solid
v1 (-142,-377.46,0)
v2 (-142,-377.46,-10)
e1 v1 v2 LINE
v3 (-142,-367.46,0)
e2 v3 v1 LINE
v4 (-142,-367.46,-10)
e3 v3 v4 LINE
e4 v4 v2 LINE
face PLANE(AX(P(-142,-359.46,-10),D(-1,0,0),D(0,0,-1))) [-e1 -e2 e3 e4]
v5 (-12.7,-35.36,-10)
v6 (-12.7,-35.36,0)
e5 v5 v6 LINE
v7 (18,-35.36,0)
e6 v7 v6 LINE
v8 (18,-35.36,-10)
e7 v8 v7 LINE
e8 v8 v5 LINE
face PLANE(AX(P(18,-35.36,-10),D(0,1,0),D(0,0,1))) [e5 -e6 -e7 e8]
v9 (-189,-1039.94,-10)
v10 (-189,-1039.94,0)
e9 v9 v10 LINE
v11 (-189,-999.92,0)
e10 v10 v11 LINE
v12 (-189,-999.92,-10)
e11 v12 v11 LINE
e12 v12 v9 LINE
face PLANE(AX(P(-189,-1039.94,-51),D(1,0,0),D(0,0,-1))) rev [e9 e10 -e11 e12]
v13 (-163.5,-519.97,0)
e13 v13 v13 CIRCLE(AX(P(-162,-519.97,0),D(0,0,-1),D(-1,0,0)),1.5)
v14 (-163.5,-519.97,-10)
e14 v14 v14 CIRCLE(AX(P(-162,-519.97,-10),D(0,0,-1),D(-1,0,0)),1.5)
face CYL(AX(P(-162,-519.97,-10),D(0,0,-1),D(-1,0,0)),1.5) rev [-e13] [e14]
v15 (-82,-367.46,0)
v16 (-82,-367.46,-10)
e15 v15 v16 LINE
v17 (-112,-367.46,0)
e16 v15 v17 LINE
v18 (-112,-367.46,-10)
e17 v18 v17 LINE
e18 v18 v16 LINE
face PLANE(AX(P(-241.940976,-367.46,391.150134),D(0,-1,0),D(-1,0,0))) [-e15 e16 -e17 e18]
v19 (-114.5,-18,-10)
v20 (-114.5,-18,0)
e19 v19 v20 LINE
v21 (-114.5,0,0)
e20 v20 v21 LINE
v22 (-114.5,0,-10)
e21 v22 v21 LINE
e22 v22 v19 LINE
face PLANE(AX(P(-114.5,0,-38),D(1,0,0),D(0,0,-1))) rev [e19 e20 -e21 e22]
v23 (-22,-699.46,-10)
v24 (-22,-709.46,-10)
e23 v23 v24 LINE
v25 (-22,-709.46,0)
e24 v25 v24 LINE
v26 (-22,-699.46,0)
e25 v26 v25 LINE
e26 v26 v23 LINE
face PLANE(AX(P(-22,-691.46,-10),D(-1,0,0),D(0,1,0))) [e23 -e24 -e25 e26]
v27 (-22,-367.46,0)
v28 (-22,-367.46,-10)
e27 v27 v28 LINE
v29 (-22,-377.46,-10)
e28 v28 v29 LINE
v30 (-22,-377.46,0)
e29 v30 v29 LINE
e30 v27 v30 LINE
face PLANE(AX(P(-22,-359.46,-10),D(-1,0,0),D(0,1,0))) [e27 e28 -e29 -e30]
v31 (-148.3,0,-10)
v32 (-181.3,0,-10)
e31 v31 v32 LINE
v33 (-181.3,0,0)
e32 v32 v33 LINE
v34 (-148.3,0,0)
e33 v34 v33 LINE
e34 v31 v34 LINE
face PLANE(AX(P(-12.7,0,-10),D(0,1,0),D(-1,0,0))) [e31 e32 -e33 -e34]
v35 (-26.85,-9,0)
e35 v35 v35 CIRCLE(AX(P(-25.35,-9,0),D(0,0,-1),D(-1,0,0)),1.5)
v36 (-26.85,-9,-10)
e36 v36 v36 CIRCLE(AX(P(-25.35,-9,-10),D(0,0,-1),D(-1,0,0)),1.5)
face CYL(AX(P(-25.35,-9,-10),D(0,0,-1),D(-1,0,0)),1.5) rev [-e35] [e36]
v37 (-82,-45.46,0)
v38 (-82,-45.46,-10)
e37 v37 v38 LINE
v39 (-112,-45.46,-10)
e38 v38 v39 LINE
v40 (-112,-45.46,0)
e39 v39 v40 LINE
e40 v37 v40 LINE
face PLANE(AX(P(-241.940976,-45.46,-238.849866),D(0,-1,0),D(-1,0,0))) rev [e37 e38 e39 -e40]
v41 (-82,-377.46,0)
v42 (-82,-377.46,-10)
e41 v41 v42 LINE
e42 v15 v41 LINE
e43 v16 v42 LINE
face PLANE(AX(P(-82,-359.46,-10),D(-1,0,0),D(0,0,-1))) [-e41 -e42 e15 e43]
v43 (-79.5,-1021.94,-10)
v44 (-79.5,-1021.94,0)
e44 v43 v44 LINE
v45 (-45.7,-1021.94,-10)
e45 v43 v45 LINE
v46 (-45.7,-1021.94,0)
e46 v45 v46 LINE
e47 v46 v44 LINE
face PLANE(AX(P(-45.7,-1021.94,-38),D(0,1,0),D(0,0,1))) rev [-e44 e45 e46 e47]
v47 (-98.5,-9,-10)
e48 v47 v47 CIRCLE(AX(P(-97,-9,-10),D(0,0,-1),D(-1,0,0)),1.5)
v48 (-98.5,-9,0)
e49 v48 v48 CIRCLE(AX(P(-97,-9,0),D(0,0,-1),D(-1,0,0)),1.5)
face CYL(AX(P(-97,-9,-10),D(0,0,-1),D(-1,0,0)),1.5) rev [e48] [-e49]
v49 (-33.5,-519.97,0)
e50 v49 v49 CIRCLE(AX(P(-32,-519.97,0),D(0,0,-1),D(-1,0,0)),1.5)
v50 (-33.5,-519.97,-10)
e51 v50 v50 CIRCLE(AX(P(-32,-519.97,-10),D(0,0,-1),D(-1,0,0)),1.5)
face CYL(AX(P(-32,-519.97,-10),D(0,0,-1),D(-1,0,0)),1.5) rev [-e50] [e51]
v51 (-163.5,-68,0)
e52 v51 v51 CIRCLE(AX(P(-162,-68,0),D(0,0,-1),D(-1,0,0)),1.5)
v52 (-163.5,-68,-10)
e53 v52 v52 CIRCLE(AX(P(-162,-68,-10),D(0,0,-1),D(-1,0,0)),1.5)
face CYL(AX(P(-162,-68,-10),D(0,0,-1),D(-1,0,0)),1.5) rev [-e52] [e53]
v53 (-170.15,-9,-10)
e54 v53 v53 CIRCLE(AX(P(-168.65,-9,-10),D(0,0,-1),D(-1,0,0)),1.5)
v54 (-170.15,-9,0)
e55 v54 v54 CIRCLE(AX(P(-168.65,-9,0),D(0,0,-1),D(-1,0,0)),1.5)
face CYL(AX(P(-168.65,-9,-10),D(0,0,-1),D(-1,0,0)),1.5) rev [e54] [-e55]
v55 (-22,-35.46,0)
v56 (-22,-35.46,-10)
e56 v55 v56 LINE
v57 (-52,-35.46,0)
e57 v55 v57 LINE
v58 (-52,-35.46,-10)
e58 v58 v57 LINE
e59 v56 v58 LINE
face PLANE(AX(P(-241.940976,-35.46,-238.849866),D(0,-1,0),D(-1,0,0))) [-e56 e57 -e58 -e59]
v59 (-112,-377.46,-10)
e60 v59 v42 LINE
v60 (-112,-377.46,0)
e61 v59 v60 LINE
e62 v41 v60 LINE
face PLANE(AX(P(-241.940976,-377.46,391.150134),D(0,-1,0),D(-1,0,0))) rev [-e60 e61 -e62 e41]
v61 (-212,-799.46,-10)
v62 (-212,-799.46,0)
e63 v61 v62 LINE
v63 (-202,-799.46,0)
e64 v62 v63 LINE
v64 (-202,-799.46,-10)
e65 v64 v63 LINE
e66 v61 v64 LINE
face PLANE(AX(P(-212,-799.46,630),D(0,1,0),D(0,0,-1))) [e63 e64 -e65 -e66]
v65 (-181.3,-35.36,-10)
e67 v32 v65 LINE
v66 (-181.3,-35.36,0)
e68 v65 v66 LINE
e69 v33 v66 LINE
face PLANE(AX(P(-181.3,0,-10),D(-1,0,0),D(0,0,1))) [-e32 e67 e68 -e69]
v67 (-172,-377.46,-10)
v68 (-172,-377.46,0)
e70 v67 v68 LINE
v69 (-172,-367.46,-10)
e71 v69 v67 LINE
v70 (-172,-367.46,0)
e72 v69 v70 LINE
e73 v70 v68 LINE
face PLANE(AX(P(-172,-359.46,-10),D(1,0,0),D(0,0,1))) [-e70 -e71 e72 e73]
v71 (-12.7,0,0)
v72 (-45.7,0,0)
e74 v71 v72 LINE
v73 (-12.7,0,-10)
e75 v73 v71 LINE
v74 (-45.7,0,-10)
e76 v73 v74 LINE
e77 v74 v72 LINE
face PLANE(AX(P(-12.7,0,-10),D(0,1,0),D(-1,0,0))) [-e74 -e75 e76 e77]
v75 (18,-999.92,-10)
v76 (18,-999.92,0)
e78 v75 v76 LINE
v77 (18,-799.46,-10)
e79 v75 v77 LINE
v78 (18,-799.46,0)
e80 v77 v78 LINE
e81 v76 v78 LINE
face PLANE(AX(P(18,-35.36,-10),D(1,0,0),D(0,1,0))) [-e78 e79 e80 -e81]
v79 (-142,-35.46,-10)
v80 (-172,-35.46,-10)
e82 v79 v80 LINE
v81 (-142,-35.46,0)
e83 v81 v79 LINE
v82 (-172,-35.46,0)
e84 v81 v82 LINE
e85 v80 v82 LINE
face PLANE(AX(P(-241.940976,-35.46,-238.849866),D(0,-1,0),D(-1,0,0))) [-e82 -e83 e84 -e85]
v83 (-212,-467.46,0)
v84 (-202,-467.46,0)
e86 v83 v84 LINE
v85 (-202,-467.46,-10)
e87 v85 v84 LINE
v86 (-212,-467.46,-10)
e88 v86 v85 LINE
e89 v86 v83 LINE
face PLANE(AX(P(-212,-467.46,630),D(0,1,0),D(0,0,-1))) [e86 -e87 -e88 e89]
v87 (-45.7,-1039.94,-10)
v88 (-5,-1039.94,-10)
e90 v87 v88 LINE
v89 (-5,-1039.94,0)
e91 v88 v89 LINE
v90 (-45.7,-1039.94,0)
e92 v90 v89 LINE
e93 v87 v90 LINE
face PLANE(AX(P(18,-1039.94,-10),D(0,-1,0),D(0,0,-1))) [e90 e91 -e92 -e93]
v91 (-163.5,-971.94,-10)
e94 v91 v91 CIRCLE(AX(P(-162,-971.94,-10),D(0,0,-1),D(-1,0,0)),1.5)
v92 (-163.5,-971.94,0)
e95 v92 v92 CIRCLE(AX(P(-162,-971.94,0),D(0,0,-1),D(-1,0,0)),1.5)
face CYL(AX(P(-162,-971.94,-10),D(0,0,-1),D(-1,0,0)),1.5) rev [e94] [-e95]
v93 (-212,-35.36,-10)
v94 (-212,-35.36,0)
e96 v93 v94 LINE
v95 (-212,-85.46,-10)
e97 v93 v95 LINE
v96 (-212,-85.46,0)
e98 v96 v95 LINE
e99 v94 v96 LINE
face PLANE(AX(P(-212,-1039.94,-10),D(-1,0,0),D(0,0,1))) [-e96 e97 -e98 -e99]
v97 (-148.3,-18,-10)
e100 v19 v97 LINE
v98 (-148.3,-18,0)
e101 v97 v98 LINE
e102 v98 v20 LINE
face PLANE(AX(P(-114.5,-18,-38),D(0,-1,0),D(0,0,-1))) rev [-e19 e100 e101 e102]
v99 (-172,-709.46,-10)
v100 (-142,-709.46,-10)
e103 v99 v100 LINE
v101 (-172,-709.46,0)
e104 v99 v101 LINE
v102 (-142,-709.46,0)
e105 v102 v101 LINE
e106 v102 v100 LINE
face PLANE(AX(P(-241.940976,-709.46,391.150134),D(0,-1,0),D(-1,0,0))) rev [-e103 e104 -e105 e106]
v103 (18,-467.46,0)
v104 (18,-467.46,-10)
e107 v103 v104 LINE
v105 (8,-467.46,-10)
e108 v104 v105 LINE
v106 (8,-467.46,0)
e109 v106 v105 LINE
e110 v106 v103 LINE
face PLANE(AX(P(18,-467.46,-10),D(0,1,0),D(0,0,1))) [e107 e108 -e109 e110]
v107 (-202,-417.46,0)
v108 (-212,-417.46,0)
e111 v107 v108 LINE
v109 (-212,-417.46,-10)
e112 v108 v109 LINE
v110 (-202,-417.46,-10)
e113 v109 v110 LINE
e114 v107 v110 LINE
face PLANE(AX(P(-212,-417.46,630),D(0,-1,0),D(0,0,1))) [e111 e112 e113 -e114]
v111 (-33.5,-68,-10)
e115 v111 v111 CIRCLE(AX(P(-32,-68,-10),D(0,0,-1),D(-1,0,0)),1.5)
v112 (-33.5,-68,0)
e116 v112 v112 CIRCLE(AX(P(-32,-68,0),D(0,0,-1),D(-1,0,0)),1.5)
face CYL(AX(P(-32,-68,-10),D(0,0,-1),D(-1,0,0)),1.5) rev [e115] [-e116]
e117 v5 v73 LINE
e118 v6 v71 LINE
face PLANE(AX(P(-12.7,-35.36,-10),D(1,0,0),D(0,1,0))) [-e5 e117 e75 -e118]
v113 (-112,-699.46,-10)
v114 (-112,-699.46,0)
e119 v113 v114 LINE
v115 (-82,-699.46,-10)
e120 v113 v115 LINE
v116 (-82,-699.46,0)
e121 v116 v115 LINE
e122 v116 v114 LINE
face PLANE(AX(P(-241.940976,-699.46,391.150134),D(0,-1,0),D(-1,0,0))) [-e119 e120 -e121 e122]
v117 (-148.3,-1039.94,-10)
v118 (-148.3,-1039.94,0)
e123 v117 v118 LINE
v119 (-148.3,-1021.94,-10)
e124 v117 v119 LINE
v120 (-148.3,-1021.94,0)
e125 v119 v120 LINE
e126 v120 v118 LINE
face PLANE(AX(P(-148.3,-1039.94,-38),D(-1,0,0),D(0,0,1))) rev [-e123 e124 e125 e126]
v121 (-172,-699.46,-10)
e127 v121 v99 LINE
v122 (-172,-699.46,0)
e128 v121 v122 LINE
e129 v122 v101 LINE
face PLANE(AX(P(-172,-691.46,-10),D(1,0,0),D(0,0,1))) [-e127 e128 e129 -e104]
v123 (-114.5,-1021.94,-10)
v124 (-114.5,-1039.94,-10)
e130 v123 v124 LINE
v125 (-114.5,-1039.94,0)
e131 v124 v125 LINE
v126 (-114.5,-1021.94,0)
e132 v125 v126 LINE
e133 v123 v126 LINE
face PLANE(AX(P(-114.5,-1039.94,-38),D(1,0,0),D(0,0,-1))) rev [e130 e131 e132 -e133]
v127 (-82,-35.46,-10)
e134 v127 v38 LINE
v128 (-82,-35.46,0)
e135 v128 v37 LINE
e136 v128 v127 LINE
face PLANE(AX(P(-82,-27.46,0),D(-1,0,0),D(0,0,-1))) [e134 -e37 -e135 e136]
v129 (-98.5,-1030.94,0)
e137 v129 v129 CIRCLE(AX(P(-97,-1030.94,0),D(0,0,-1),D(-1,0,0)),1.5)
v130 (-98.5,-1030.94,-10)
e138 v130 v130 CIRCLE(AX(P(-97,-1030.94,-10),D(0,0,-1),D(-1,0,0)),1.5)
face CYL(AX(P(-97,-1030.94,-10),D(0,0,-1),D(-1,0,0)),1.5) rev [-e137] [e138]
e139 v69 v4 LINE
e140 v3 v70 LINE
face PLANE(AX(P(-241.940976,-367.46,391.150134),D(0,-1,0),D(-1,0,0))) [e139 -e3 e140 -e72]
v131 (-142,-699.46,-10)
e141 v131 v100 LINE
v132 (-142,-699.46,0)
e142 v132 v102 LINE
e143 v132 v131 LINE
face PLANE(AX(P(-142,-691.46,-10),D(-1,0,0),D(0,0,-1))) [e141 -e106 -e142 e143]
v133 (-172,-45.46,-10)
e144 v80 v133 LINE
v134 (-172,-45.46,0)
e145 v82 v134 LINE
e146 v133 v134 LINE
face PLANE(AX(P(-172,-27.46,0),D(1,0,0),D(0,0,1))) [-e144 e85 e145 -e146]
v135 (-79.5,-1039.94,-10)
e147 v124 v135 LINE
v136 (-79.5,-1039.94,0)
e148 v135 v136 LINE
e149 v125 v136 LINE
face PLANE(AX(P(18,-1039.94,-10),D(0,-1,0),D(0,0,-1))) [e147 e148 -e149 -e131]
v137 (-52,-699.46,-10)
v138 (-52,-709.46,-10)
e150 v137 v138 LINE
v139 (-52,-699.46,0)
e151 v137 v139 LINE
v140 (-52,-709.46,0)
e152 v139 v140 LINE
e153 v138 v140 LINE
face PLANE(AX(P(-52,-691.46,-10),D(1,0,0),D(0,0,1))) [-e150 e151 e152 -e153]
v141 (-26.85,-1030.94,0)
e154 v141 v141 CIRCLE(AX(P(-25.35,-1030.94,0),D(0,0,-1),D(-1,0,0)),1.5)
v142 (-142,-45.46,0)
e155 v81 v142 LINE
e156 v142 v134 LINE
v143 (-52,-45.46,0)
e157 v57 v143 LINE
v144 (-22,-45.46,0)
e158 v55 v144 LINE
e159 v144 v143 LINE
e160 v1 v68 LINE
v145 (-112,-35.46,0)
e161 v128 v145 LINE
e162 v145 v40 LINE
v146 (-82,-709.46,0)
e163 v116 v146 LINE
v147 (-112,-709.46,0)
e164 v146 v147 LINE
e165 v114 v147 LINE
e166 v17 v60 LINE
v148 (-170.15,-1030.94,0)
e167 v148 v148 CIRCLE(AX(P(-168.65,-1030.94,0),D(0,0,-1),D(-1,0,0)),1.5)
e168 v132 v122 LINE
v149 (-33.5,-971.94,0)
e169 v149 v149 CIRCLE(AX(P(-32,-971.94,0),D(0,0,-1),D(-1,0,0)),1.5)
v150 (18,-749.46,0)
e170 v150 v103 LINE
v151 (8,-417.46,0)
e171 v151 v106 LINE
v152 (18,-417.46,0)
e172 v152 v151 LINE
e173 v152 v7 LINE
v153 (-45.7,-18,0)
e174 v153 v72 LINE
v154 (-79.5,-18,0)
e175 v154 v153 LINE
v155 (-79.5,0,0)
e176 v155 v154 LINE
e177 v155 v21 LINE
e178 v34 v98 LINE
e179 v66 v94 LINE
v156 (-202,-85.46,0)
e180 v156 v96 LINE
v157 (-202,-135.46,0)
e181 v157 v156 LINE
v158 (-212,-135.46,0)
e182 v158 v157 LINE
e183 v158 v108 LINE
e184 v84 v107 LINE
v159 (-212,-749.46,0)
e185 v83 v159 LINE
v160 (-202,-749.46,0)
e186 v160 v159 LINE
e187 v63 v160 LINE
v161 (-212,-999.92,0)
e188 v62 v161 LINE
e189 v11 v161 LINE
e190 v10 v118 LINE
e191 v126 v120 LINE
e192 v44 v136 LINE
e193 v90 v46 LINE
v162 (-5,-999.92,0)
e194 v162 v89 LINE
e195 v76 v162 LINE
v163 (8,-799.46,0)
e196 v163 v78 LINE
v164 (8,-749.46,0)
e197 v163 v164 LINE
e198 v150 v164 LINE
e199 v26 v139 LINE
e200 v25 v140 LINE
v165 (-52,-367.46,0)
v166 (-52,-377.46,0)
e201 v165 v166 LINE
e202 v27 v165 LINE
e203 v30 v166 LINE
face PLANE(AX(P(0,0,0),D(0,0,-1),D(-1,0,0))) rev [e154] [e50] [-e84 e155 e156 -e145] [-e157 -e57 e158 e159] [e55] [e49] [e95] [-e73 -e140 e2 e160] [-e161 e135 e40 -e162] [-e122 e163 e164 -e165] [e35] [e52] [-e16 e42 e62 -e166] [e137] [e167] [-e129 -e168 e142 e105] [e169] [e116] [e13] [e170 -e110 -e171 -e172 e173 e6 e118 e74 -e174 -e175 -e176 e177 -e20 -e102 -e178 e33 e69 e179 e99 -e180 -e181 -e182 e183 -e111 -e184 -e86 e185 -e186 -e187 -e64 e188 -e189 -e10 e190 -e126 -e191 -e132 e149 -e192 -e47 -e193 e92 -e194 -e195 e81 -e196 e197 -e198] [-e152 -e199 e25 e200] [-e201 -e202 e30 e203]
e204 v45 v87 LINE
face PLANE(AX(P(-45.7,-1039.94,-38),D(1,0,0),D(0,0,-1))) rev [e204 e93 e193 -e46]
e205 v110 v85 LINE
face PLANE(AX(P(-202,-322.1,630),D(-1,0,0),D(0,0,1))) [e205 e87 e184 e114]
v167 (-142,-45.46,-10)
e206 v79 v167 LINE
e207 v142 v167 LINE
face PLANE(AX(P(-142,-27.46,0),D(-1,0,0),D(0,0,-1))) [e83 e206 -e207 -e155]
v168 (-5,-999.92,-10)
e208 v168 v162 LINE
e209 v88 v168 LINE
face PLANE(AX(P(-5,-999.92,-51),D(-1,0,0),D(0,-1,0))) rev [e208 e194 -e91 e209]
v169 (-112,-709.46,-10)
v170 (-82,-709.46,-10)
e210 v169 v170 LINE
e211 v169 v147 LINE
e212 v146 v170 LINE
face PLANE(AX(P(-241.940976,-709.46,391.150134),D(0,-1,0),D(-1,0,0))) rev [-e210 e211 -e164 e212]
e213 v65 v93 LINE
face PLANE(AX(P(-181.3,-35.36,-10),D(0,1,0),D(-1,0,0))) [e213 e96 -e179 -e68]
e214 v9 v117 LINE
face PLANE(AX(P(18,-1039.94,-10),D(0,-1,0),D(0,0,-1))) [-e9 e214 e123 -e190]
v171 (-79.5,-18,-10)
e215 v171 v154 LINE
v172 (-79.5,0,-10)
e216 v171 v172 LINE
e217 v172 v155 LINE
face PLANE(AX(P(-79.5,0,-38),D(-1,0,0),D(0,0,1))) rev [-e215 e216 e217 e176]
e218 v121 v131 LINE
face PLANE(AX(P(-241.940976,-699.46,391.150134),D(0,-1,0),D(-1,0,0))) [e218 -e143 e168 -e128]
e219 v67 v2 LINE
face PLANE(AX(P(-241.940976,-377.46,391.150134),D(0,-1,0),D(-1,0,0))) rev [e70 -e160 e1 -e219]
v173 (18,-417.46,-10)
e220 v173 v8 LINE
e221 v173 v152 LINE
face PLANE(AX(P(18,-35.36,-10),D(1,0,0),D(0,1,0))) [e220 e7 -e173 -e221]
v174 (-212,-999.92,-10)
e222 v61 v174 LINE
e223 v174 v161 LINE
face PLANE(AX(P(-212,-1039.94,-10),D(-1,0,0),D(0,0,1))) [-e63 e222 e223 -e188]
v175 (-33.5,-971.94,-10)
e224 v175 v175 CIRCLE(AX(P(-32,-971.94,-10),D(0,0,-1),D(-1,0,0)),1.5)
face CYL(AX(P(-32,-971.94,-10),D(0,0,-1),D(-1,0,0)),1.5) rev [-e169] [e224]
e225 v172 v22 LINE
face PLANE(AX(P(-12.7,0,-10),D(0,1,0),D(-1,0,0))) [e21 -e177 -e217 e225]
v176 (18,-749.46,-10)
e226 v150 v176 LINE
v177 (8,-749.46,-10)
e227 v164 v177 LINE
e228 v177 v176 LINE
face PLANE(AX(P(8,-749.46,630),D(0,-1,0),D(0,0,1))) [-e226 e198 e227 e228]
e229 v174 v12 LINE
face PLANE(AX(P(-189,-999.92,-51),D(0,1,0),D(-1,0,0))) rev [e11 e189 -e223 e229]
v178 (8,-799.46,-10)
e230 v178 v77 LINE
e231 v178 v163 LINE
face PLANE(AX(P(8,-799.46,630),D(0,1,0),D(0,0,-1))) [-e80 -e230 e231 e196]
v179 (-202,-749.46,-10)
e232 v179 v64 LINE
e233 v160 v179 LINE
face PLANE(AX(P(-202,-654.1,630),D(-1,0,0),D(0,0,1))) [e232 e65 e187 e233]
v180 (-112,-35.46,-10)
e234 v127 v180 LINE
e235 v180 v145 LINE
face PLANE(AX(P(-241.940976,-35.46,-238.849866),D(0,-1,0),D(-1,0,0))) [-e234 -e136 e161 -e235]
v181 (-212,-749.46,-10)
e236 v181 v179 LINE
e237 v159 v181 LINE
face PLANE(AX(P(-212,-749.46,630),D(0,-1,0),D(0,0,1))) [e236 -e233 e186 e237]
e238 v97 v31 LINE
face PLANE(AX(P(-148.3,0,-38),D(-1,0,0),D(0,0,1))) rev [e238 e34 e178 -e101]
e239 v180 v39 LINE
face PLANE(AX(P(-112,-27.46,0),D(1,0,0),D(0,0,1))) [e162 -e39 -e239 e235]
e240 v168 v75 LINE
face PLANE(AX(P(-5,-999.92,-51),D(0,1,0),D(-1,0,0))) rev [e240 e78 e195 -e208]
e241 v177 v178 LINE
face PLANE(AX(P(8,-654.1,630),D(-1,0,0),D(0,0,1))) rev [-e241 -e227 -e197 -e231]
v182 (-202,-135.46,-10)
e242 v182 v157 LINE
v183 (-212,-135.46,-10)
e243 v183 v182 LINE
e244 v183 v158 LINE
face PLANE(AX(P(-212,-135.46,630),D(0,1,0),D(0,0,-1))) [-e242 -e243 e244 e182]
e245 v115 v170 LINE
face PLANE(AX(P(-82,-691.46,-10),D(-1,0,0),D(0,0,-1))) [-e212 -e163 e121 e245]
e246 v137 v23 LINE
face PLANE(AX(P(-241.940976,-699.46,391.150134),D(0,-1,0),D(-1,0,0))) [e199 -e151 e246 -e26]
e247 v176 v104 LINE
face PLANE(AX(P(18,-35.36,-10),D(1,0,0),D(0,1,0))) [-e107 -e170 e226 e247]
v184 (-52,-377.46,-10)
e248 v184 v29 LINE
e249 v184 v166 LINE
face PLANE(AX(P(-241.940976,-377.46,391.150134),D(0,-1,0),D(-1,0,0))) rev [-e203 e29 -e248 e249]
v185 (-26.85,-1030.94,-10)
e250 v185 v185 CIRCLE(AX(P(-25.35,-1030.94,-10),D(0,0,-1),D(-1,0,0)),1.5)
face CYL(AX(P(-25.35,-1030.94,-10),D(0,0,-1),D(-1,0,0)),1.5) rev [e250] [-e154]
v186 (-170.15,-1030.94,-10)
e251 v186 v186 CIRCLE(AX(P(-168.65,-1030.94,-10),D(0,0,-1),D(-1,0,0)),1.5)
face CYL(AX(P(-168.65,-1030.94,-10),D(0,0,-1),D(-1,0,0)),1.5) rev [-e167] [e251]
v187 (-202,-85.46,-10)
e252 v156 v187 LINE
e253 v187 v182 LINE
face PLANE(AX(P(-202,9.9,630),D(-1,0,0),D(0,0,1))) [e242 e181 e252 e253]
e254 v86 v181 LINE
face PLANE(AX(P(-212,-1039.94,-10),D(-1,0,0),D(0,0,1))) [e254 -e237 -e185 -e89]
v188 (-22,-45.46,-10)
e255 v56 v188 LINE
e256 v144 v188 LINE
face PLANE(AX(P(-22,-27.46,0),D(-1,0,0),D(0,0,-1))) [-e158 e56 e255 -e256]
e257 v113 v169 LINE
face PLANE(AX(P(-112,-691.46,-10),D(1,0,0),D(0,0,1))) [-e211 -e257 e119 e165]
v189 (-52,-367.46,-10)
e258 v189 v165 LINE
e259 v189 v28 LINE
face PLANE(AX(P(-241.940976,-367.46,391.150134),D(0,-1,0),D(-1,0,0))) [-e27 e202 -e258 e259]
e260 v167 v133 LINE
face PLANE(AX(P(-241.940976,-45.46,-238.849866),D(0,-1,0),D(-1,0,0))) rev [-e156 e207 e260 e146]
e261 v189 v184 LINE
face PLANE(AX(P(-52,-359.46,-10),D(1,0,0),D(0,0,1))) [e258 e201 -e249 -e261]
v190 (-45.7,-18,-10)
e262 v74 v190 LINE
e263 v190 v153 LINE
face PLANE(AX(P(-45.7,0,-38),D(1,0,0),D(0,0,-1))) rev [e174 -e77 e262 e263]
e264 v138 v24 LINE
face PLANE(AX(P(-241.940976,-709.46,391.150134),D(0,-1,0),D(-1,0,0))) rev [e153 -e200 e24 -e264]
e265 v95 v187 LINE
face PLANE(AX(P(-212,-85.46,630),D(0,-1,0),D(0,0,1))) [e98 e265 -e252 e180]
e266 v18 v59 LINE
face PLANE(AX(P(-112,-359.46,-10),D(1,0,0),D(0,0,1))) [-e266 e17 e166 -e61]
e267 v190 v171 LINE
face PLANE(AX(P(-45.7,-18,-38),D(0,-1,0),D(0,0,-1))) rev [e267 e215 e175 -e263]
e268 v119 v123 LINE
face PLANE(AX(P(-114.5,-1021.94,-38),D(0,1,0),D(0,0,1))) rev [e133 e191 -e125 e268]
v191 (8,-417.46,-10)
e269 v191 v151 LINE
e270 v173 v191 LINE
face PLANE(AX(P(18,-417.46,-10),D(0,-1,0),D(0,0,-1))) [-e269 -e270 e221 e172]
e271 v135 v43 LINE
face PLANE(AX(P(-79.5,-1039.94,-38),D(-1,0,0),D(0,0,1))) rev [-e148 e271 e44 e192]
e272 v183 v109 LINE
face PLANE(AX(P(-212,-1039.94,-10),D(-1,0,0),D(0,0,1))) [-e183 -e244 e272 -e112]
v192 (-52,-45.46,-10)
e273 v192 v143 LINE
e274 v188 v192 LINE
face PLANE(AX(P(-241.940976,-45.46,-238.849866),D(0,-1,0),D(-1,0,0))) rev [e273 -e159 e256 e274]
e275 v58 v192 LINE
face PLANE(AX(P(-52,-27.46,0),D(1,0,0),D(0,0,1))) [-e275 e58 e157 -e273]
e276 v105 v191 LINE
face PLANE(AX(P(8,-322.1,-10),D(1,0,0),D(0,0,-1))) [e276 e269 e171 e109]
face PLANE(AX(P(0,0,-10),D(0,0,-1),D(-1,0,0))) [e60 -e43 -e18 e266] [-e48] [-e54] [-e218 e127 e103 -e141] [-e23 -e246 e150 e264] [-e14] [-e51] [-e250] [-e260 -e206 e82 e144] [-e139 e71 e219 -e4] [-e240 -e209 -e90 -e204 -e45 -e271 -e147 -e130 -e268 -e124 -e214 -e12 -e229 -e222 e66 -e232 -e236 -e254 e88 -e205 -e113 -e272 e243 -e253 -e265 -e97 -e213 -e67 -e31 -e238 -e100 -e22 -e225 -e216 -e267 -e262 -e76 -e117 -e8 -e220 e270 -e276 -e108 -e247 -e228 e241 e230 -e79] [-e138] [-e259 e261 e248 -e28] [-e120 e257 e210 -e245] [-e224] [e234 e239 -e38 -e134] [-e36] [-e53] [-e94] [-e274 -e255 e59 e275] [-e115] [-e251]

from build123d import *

# Parameters (mm, degrees)
BOSS_EXTRUDE1_DEPTH          = 10
SKETCH2_W                    = 33.8
SKETCH2_H                    = 18
CUT_EXTRUDE1_DEPTH           = 38
SKETCH3_W                    = 23
SKETCH3_H                    = 40.02
CUT_EXTRUDE2_DEPTH           = 51
CAVITY1_START                = -212
CAVITY1_OUTLINE_W            = 50
CAVITY1_OUTLINE_H            = 10
CAVITY1_DEPTH                = 10
CAVITY1_START_2              = 8
CAVITY1_2_OUTLINE_W          = 50
CAVITY1_2_OUTLINE_H          = 10
CAVITY1_2_DEPTH              = 10
CAVITY1_START_3              = -172
CAVITY1_3_OUTLINE_W          = 10
CAVITY1_3_OUTLINE_H          = 10
CAVITY1_3_DEPTH              = 30
CAVITY1_START_4              = -112
CAVITY1_4_OUTLINE_W          = 10
CAVITY1_4_OUTLINE_H          = 10
CAVITY1_4_DEPTH              = 30
CAVITY1_START_5              = -52
CAVITY1_5_OUTLINE_W          = 10
CAVITY1_5_OUTLINE_H          = 10
CAVITY1_5_DEPTH              = 30
F_3_0_3_DIAMETER_HOLE1_D     = 3
F_3_0_3_DIAMETER_HOLE1_DEPTH = 15
F_3_0_3_DIAMETER_HOLE1_TIP   = 0.901290929


# Read off the part's stored shape, not the designer's step: Cavity1
with BuildPart() as part:
    # Sketch1 → Boss-Extrude1 (new body)
    with BuildSketch(Plane.XY):
        Polygon((18, -35.36), (-12.7, -35.36), (-12.7, 0), (-181.3, 0), (-181.3, -35.36), (-212, -35.36), (-212, -1039.94), (18, -1039.94), align=None)
    extrude(amount=-BOSS_EXTRUDE1_DEPTH)

    # Sketch2 → Cut-Extrude1 (cut)
    with BuildSketch(Plane.XY):
        with Locations((-62.6, -9)):
            Rectangle(SKETCH2_W, SKETCH2_H)
        with Locations((-131.4, -9)):
            Rectangle(SKETCH2_W, SKETCH2_H)
        with Locations((-131.4, -1030.94)):
            Rectangle(SKETCH2_W, SKETCH2_H)
        with Locations((-62.6, -1030.94)):
            Rectangle(SKETCH2_W, SKETCH2_H)
    extrude(amount=-CUT_EXTRUDE1_DEPTH, mode=Mode.SUBTRACT)

    # Sketch3 → Cut-Extrude2 (cut)
    with BuildSketch(Plane.XY):
        with Locations((-200.5, -1019.93)):
            Rectangle(SKETCH3_W, SKETCH3_H)
        with Locations((6.5, -1019.93)):
            Rectangle(SKETCH3_W, SKETCH3_H)
    extrude(amount=-CUT_EXTRUDE2_DEPTH, mode=Mode.SUBTRACT)

    # Cavity1 outline → Cavity1 (cut)
    with BuildSketch(Plane.YZ.offset(CAVITY1_START)):
        with Locations((-110.46, -5)):
            Rectangle(CAVITY1_OUTLINE_W, CAVITY1_OUTLINE_H)
        with Locations((-442.46, -5)):
            Rectangle(CAVITY1_OUTLINE_W, CAVITY1_OUTLINE_H)
        with Locations((-774.46, -5)):
            Rectangle(CAVITY1_OUTLINE_W, CAVITY1_OUTLINE_H)
    extrude(amount=CAVITY1_DEPTH, mode=Mode.SUBTRACT)

    # Cavity1 2 outline → Cavity1 2 (cut)
    with BuildSketch(Plane.YZ.offset(CAVITY1_START_2)):
        with Locations((-442.46, -5)):
            Rectangle(CAVITY1_2_OUTLINE_W, CAVITY1_2_OUTLINE_H)
        with Locations((-774.46, -5)):
            Rectangle(CAVITY1_2_OUTLINE_W, CAVITY1_2_OUTLINE_H)
    extrude(amount=CAVITY1_2_DEPTH, mode=Mode.SUBTRACT)

    # Cavity1 3 outline → Cavity1 3 (cut)
    with BuildSketch(Plane.YZ.offset(CAVITY1_START_3)):
        with Locations((-40.46, -5)):
            Rectangle(CAVITY1_3_OUTLINE_W, CAVITY1_3_OUTLINE_H)
        with Locations((-372.46, -5)):
            Rectangle(CAVITY1_3_OUTLINE_W, CAVITY1_3_OUTLINE_H)
        with Locations((-704.46, -5)):
            Rectangle(CAVITY1_3_OUTLINE_W, CAVITY1_3_OUTLINE_H)
    extrude(amount=CAVITY1_3_DEPTH, mode=Mode.SUBTRACT)

    # Cavity1 4 outline → Cavity1 4 (cut)
    with BuildSketch(Plane.YZ.offset(CAVITY1_START_4)):
        with Locations((-40.46, -5)):
            Rectangle(CAVITY1_4_OUTLINE_W, CAVITY1_4_OUTLINE_H)
        with Locations((-372.46, -5)):
            Rectangle(CAVITY1_4_OUTLINE_W, CAVITY1_4_OUTLINE_H)
        with Locations((-704.46, -5)):
            Rectangle(CAVITY1_4_OUTLINE_W, CAVITY1_4_OUTLINE_H)
    extrude(amount=CAVITY1_4_DEPTH, mode=Mode.SUBTRACT)

    # Cavity1 5 outline → Cavity1 5 (cut)
    with BuildSketch(Plane.YZ.offset(CAVITY1_START_5)):
        with Locations((-40.46, -5)):
            Rectangle(CAVITY1_5_OUTLINE_W, CAVITY1_5_OUTLINE_H)
        with Locations((-372.46, -5)):
            Rectangle(CAVITY1_5_OUTLINE_W, CAVITY1_5_OUTLINE_H)
        with Locations((-704.46, -5)):
            Rectangle(CAVITY1_5_OUTLINE_W, CAVITY1_5_OUTLINE_H)
    extrude(amount=CAVITY1_5_DEPTH, mode=Mode.SUBTRACT)

    # Ø3.0 (3) Diameter Hole1
    with Locations(Plane(origin=(0, 0, -10), x_dir=(-1, 0, 0), z_dir=(0, 0, -1))):
        with Locations((162, -971.94), (32, -68), (162, -68), (32, -971.94), (32, -519.97), (162, -519.97), (97, -1030.94), (168.65, -1030.94), (25.35, -1030.94), (25.35, -9), (168.65, -9), (97, -9)):
            Hole(F_3_0_3_DIAMETER_HOLE1_D / 2, depth=F_3_0_3_DIAMETER_HOLE1_DEPTH)
            with Locations((0, 0, -(F_3_0_3_DIAMETER_HOLE1_DEPTH + F_3_0_3_DIAMETER_HOLE1_TIP / 2))):  # 118° drill point
                Cone(0, F_3_0_3_DIAMETER_HOLE1_D / 2, F_3_0_3_DIAMETER_HOLE1_TIP, mode=Mode.SUBTRACT)


solid = part.part
